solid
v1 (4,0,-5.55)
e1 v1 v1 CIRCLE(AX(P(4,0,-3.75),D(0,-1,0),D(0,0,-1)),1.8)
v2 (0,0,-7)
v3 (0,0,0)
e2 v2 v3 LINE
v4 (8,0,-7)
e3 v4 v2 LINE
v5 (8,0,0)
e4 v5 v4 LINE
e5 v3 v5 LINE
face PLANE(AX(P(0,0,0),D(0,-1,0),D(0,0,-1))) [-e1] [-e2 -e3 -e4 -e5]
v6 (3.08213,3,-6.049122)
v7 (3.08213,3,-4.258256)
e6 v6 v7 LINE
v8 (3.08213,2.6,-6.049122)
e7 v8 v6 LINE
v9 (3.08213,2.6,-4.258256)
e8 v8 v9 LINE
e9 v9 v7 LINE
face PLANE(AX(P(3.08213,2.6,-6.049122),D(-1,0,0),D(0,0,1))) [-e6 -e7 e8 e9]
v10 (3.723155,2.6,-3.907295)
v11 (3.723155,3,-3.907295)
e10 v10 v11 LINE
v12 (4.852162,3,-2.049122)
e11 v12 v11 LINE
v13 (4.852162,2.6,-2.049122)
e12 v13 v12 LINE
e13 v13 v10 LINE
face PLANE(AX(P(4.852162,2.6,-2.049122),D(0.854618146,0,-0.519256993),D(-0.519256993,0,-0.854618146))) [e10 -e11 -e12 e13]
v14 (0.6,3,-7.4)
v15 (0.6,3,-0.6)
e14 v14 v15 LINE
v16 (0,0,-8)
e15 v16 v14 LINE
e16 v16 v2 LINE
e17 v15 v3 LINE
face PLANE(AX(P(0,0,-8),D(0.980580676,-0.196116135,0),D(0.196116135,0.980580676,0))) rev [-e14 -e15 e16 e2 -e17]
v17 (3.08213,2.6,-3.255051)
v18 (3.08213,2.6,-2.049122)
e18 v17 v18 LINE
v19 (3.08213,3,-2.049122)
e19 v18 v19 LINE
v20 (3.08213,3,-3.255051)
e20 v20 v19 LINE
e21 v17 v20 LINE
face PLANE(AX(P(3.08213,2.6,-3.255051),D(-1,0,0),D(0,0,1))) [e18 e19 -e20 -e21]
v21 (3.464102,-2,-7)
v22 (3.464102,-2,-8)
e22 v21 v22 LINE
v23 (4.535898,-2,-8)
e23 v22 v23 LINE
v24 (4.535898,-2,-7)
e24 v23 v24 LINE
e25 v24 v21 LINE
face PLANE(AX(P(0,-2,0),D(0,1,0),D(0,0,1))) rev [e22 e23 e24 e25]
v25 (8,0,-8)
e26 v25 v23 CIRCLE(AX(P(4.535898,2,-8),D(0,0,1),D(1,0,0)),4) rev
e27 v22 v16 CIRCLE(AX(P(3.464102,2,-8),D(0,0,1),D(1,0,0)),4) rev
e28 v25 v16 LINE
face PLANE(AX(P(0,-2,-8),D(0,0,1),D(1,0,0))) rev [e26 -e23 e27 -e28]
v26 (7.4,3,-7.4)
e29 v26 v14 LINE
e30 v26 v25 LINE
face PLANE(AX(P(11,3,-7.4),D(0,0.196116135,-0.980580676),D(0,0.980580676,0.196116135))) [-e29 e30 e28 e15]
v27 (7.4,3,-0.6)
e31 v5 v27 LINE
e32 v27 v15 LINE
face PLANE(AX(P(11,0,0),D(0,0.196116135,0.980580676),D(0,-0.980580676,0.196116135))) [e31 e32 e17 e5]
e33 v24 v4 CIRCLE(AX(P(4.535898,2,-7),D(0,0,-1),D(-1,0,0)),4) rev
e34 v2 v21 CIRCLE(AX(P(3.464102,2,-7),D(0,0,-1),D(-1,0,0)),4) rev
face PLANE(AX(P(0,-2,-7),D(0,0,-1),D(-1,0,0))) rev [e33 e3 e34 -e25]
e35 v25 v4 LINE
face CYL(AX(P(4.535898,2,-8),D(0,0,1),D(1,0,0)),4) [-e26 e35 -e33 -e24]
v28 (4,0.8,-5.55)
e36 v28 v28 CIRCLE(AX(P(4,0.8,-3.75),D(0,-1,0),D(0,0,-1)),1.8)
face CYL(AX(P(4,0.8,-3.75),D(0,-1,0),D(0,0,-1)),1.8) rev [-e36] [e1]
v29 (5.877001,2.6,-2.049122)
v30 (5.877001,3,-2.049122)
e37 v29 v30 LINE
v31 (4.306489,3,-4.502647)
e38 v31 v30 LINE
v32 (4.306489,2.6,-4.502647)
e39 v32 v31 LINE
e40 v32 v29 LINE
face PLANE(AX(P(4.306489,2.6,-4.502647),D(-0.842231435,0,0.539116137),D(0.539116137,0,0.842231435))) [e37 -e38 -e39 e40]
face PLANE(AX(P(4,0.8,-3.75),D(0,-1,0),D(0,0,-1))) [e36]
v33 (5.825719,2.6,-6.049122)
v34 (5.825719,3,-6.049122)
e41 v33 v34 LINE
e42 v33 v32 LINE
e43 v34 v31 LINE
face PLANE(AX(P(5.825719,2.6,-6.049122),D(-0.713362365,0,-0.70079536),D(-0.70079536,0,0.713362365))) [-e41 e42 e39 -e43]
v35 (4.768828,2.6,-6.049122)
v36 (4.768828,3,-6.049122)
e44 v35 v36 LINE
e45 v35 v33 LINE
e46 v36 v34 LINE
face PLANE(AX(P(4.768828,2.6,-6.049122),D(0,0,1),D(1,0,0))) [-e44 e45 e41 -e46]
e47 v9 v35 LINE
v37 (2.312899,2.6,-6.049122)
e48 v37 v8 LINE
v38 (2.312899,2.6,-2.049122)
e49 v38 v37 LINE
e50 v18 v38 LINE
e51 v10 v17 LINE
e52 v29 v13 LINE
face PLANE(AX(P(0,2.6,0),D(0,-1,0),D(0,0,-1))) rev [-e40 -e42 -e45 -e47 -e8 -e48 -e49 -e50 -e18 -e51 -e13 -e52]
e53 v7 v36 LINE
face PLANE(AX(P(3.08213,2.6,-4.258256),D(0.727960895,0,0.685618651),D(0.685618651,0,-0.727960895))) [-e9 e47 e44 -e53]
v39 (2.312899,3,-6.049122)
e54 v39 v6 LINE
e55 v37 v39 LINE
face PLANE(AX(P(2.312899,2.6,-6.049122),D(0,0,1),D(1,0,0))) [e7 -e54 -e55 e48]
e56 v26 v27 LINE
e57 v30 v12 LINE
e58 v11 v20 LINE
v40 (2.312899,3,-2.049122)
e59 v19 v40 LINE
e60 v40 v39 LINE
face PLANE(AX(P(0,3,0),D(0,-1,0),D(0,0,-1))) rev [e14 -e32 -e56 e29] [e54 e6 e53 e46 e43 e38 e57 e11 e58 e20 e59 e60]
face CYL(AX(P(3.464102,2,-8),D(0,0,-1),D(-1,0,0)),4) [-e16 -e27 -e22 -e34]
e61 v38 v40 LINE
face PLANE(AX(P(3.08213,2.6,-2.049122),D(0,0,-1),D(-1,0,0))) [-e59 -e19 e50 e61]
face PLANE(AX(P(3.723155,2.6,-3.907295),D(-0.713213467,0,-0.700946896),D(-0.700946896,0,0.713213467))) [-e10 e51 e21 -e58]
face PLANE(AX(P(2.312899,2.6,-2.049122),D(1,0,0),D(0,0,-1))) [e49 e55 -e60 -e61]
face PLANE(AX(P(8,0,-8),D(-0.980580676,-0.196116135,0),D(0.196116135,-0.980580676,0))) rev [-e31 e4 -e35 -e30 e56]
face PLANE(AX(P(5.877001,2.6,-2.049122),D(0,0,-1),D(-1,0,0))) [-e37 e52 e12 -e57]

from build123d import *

# Parameters (mm, degrees)
SKETCH1_W               = 8
SKETCH1_H               = 8
BOSS_EXTRUDE1_DEPTH     = 3
CUT_EXTRUDE1_DEPTH      = 12.704699911
CUT_EXTRUDE1_DEPTH_BACK = 12.704699911
CUT_EXTRUDE2_DEPTH      = 11
SKETCH4_R               = 1.8
CUT_EXTRUDE3_DEPTH      = 0.8
SKETCH5_W               = 8
SKETCH5_H               = 1
BOSS_EXTRUDE2_DEPTH     = 2
FILLET1_R               = 4
CUT_EXTRUDE4_DEPTH      = 0.4


with BuildPart() as part:
    # Sketch1 → Boss-Extrude1 (new body)
    with BuildSketch(Plane(origin=(0, 0, 0), x_dir=(1, 0, 0), z_dir=(0, 1, 0))):
        with Locations((4, 4)):
            Rectangle(SKETCH1_W, SKETCH1_H)
    extrude(amount=BOSS_EXTRUDE1_DEPTH)

    # Sketch2 → Cut-Extrude1 (cut, two sides: drawn at the far end of the back side and taken through both)
    with BuildSketch(Plane.XY.offset(-CUT_EXTRUDE1_DEPTH_BACK)):
        Polygon((0, 0), (0.6, 3), (0, 3), align=None)
        Polygon((8, 0), (7.4, 3), (8, 3), align=None)
    extrude(amount=CUT_EXTRUDE1_DEPTH + CUT_EXTRUDE1_DEPTH_BACK, mode=Mode.SUBTRACT)

    # Sketch3 → Cut-Extrude2 (cut)
    with BuildSketch(Plane(origin=(0, 0, 0), x_dir=(0, 0, -1), z_dir=(1, 0, 0))):
        Polygon((0, 0), (0.6, 3), (0, 3), align=None)
        Polygon((8, 3), (7.4, 3), (8, 0), align=None)
    extrude(amount=CUT_EXTRUDE2_DEPTH, mode=Mode.SUBTRACT)

    # Sketch4 → Cut-Extrude3 (cut)
    with BuildSketch(Plane.XZ):
        with Locations(Location((4, -3.75, 0), (0, 0, 270))):
            Circle(SKETCH4_R)
    extrude(amount=-CUT_EXTRUDE3_DEPTH, mode=Mode.SUBTRACT)

    # Sketch5 → Boss-Extrude2 (add)
    with BuildSketch(Plane.XZ):
        with Locations((4, -7.5)):
            Rectangle(SKETCH5_W, SKETCH5_H)
    extrude(amount=BOSS_EXTRUDE2_DEPTH)

    # Fillet1
    # the kernel refuses this fillet: 4 mm, written as the material it takes off along each edge
    with BuildSketch(Plane(origin=(8, -2, -16.660254038), x_dir=(0, 1, 0), z_dir=(0, 0, 1)), Plane(origin=(0, -2, 1.660254038), x_dir=(0, 1, 0), z_dir=(0, 0, -1))) as fillet1_piece_1:
        with BuildLine():
            CenterArc((4, 3.464101615), FILLET1_R, 180, 60)
            Line((0, 3.464101615), (-0.08, 3.464101615))
            Line((-0.08, 3.464101615), (-0.08, 0))
            Line((-0.08, 0), (0, -0.08))
            ThreePointArc((0, -0.08), (1, -0.08), (1.96, -0.069282032))
            Line((1.96, -0.069282032), (2, 0))
        make_face()
    extrude(amount=18.320508076, mode=Mode.SUBTRACT)

    # Sketch6 → Cut-Extrude4 (cut)
    with BuildSketch(Plane(origin=(0, 3, 0), x_dir=(1, 0, 0), z_dir=(0, 1, 0))):
        Polygon((2.312898911, 2.049121591), (2.312898911, 6.049121591), (3.08212968, 6.049121591), (3.08212968, 4.258256206), (4.768828398, 6.049121591), (5.825719424, 6.049121591), (4.306488654, 4.502647232), (5.877001475, 2.049121591), (4.852161731, 2.049121591), (3.723155321, 3.907294667), (3.08212968, 3.255051078), (3.08212968, 2.049121591), align=None)
    extrude(amount=-CUT_EXTRUDE4_DEPTH, mode=Mode.SUBTRACT)


solid = part.part
